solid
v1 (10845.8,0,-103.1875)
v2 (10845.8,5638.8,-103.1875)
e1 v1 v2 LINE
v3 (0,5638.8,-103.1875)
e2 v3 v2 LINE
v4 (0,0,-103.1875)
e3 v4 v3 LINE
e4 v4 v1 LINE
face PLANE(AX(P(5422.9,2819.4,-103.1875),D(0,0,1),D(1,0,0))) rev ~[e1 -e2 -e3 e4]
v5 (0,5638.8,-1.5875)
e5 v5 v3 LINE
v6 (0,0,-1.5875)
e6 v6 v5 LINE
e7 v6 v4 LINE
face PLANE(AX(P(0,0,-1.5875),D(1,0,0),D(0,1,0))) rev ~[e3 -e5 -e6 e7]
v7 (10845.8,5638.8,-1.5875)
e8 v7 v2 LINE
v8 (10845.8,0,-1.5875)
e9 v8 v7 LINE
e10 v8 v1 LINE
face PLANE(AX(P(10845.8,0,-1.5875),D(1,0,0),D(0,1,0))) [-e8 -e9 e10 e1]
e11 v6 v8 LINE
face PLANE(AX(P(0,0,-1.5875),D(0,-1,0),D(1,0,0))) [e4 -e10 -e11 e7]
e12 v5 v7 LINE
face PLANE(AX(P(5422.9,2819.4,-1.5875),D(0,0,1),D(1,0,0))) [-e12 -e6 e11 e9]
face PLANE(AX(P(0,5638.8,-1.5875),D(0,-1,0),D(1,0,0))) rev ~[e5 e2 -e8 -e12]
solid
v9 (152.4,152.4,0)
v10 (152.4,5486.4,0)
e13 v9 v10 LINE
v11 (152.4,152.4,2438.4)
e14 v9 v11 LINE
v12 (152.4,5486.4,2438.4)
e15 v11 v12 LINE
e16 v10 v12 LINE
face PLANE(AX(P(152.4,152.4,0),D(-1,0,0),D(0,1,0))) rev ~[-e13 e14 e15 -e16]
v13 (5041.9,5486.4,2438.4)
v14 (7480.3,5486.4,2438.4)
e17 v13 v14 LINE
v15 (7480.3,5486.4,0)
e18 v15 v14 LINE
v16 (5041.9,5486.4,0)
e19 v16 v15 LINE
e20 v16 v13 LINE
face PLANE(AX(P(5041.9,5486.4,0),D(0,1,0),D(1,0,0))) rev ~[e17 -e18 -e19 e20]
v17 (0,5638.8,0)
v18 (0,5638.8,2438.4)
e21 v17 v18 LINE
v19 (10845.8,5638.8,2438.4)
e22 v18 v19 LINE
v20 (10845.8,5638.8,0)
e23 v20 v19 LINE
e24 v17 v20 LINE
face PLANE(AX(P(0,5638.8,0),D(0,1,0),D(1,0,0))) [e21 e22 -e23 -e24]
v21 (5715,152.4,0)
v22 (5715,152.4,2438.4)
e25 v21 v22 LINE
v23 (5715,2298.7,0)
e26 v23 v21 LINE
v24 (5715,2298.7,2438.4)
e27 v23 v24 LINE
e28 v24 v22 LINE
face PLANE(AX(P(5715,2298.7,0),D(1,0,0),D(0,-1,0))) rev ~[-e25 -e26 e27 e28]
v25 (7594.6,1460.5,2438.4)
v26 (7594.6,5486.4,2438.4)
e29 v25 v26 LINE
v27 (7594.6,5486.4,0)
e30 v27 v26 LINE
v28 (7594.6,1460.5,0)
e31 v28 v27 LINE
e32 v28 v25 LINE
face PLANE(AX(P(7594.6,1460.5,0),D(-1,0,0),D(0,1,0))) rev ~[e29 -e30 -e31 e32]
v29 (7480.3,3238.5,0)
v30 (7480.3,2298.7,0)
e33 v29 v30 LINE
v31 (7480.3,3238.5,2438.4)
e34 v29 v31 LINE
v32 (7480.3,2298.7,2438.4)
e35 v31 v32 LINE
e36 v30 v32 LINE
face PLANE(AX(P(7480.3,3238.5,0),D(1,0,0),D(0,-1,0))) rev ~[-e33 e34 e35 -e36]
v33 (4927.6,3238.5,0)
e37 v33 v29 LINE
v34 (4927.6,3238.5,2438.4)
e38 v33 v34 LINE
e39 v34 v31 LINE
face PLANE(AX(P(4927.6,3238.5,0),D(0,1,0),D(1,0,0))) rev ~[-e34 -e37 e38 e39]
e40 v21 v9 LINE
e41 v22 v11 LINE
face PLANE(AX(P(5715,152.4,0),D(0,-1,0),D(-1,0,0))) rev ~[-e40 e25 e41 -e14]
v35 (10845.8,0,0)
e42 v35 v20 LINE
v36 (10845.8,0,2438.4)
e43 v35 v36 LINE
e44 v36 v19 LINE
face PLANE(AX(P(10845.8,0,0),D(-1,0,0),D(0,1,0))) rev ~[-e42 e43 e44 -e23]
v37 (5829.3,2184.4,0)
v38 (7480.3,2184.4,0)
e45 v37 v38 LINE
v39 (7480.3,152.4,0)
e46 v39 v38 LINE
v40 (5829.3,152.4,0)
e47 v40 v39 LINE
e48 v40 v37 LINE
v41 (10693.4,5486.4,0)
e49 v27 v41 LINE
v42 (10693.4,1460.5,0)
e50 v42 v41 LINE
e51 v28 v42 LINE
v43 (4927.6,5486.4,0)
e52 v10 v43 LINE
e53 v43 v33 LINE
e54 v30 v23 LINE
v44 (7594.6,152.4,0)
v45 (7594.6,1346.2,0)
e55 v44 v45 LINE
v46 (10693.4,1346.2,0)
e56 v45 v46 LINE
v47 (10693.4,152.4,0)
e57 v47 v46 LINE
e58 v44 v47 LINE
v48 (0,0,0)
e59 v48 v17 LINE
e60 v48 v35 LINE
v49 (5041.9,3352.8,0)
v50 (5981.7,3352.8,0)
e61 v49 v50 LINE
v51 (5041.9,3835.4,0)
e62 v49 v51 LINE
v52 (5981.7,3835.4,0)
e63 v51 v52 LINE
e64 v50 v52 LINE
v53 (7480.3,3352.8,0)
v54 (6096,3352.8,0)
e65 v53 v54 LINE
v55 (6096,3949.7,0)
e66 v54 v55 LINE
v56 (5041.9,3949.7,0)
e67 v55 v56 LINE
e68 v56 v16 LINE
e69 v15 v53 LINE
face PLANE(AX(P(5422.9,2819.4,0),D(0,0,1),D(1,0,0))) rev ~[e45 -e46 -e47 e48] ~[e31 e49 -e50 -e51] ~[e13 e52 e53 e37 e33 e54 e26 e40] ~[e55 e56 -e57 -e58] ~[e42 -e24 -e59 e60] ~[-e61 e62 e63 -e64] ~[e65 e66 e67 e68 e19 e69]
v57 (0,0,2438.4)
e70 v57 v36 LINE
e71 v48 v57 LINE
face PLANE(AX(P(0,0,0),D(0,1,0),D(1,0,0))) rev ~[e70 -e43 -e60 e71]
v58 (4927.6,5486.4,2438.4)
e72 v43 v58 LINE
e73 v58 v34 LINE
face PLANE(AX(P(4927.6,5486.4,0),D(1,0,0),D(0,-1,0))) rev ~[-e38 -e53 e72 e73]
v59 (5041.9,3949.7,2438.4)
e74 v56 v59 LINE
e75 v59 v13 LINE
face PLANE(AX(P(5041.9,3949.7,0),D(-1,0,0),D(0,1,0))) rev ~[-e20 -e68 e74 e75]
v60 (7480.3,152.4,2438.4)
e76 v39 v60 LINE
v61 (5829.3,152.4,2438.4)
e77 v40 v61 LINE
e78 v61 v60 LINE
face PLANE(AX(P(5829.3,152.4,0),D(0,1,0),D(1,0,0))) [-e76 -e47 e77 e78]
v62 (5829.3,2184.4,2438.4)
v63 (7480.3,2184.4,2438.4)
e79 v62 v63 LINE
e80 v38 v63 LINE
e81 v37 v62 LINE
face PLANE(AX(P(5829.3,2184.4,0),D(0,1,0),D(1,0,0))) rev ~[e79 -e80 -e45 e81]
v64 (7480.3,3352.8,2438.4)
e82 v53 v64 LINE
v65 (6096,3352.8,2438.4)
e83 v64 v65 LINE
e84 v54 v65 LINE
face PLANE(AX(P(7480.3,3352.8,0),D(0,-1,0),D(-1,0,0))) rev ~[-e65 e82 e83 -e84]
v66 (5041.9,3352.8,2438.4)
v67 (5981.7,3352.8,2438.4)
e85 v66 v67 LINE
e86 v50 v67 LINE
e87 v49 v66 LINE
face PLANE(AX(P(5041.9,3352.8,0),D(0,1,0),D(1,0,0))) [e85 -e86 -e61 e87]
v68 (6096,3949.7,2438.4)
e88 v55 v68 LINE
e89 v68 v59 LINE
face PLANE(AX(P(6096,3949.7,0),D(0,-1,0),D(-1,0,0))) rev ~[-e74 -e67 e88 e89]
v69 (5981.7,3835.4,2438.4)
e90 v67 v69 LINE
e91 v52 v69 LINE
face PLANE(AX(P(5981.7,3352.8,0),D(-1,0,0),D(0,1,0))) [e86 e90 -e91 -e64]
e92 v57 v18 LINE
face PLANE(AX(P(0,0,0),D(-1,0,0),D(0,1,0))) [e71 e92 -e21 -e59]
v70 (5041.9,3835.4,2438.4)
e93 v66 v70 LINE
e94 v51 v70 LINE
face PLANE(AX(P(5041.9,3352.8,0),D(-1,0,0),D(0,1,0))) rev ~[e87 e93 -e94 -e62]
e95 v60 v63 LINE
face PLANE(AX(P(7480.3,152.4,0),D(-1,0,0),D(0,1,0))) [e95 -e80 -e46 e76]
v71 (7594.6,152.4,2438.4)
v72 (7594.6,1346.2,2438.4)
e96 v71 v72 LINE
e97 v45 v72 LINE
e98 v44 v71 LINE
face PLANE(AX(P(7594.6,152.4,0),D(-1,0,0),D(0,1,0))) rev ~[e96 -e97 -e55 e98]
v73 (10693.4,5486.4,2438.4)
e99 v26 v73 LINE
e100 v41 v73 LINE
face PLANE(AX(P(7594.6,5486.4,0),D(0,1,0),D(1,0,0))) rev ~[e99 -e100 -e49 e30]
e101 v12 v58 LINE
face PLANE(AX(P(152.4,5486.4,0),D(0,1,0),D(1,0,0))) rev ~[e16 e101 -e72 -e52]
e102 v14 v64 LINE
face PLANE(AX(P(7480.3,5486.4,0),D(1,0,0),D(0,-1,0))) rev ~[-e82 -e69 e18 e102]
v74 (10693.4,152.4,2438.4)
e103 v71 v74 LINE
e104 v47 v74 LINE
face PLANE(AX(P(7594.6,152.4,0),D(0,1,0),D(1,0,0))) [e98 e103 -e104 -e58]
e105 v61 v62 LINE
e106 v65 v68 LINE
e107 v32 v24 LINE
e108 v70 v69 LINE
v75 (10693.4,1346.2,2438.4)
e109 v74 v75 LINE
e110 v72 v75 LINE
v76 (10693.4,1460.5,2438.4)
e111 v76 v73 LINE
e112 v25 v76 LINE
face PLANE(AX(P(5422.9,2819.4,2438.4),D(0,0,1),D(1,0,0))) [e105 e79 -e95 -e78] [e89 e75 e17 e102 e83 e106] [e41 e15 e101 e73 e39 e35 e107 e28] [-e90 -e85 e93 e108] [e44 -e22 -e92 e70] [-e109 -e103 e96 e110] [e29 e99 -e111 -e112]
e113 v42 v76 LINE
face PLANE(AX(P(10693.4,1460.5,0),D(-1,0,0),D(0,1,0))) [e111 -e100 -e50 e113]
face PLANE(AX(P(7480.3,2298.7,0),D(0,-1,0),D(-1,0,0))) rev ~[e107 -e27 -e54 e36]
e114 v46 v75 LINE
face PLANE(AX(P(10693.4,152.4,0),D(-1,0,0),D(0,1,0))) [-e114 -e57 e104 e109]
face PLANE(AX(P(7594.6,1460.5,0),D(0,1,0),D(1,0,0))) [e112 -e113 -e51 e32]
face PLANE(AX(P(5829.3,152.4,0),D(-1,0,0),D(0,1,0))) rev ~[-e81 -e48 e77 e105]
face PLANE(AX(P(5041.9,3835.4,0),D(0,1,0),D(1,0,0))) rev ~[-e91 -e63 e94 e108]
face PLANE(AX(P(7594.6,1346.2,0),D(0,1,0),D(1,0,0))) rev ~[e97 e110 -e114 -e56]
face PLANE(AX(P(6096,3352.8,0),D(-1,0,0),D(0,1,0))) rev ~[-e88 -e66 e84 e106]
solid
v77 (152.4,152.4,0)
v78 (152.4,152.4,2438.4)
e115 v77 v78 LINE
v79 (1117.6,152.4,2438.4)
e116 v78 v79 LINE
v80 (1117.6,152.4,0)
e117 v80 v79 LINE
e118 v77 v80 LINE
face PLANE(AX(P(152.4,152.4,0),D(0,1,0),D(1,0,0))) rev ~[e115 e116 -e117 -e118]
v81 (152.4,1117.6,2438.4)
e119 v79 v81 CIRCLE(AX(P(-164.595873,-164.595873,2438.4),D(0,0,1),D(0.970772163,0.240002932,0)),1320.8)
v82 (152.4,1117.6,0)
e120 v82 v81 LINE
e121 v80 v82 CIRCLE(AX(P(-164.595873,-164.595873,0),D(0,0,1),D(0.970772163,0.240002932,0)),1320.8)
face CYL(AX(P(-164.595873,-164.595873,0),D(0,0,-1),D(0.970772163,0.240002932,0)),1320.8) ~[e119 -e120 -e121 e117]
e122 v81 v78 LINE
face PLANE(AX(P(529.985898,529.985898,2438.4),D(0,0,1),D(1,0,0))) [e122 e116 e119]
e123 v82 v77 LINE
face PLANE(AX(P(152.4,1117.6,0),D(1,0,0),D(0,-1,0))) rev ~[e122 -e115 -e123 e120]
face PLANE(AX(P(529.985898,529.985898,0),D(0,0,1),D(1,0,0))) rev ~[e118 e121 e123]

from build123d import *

# Parameters (mm, degrees)
F1_W     = 10845.8
F1_H     = 5638.8
F1_W_2   = 1651
F1_H_2   = 2032
F1_W_3   = 3098.8
F1_H_3   = 1193.8
F1_W_4   = 939.8
F1_H_4   = 482.6
F1_H_5   = 4025.9
F3_DEPTH = 2438.4
F4_W     = 10845.8
F4_H     = 5638.8
F5_DEPTH = 101.6


# Not quite as in the source:
# - a length typed as a fraction of an inch, garbled in the dataset ("3 / 203.2 mm" for 3/8 in), is restored


with BuildPart() as f3:
    # F1 (on Top) → F3 (new body)
    with BuildSketch(Plane.XY):
        with Locations((5422.9, 2819.4)):
            Rectangle(F1_W, F1_H)
        Polygon((4927.6, 5486.4), (4927.6, 3238.5), (5041.9, 3238.5), (7480.3, 3238.5), (7480.3, 2298.7), (5829.3, 2298.7), (5715, 2298.7), (5715, 152.4), (152.4, 152.4), (152.4, 5486.4), align=None, mode=Mode.SUBTRACT)
        with Locations((6654.8, 1168.4)):
            Rectangle(F1_W_2, F1_H_2, mode=Mode.SUBTRACT)
        with Locations((9144, 749.3)):
            Rectangle(F1_W_3, F1_H_3, mode=Mode.SUBTRACT)
        with Locations((5511.8, 3594.1)):
            Rectangle(F1_W_4, F1_H_4, mode=Mode.SUBTRACT)
        with Locations((9144, 3473.45)):
            Rectangle(F1_W_3, F1_H_5, mode=Mode.SUBTRACT)
        Polygon((6096, 3949.7), (5041.9, 3949.7), (5041.9, 5486.4), (7480.3, 5486.4), (7480.3, 3352.8), (6096, 3352.8), (6096, 3835.4), align=None, mode=Mode.SUBTRACT)
    extrude(amount=F3_DEPTH)


with BuildPart() as f3b:
    # F2 (on Top) → F3, piece 2 (new body)
    with BuildSketch(Plane.XY):
        with BuildLine():
            Line((152.4, 152.4), (1117.6, 152.4))
            ThreePointArc((1117.6, 152.4), (769.3507636654, 769.3507636654), (152.4, 1117.6))
            Line((152.4, 1117.6), (152.4, 152.4))
        make_face()
    extrude(amount=F3_DEPTH)


with BuildPart() as f5:
    # F4 (on offset) → F5 (new body)
    with BuildSketch(Plane.XY.offset(-1.5875)):
        with Locations((5422.9, 2819.4)):
            Rectangle(F4_W, F4_H)
    extrude(amount=-F5_DEPTH)


solid = Compound([f3.part, f3b.part, f5.part])
